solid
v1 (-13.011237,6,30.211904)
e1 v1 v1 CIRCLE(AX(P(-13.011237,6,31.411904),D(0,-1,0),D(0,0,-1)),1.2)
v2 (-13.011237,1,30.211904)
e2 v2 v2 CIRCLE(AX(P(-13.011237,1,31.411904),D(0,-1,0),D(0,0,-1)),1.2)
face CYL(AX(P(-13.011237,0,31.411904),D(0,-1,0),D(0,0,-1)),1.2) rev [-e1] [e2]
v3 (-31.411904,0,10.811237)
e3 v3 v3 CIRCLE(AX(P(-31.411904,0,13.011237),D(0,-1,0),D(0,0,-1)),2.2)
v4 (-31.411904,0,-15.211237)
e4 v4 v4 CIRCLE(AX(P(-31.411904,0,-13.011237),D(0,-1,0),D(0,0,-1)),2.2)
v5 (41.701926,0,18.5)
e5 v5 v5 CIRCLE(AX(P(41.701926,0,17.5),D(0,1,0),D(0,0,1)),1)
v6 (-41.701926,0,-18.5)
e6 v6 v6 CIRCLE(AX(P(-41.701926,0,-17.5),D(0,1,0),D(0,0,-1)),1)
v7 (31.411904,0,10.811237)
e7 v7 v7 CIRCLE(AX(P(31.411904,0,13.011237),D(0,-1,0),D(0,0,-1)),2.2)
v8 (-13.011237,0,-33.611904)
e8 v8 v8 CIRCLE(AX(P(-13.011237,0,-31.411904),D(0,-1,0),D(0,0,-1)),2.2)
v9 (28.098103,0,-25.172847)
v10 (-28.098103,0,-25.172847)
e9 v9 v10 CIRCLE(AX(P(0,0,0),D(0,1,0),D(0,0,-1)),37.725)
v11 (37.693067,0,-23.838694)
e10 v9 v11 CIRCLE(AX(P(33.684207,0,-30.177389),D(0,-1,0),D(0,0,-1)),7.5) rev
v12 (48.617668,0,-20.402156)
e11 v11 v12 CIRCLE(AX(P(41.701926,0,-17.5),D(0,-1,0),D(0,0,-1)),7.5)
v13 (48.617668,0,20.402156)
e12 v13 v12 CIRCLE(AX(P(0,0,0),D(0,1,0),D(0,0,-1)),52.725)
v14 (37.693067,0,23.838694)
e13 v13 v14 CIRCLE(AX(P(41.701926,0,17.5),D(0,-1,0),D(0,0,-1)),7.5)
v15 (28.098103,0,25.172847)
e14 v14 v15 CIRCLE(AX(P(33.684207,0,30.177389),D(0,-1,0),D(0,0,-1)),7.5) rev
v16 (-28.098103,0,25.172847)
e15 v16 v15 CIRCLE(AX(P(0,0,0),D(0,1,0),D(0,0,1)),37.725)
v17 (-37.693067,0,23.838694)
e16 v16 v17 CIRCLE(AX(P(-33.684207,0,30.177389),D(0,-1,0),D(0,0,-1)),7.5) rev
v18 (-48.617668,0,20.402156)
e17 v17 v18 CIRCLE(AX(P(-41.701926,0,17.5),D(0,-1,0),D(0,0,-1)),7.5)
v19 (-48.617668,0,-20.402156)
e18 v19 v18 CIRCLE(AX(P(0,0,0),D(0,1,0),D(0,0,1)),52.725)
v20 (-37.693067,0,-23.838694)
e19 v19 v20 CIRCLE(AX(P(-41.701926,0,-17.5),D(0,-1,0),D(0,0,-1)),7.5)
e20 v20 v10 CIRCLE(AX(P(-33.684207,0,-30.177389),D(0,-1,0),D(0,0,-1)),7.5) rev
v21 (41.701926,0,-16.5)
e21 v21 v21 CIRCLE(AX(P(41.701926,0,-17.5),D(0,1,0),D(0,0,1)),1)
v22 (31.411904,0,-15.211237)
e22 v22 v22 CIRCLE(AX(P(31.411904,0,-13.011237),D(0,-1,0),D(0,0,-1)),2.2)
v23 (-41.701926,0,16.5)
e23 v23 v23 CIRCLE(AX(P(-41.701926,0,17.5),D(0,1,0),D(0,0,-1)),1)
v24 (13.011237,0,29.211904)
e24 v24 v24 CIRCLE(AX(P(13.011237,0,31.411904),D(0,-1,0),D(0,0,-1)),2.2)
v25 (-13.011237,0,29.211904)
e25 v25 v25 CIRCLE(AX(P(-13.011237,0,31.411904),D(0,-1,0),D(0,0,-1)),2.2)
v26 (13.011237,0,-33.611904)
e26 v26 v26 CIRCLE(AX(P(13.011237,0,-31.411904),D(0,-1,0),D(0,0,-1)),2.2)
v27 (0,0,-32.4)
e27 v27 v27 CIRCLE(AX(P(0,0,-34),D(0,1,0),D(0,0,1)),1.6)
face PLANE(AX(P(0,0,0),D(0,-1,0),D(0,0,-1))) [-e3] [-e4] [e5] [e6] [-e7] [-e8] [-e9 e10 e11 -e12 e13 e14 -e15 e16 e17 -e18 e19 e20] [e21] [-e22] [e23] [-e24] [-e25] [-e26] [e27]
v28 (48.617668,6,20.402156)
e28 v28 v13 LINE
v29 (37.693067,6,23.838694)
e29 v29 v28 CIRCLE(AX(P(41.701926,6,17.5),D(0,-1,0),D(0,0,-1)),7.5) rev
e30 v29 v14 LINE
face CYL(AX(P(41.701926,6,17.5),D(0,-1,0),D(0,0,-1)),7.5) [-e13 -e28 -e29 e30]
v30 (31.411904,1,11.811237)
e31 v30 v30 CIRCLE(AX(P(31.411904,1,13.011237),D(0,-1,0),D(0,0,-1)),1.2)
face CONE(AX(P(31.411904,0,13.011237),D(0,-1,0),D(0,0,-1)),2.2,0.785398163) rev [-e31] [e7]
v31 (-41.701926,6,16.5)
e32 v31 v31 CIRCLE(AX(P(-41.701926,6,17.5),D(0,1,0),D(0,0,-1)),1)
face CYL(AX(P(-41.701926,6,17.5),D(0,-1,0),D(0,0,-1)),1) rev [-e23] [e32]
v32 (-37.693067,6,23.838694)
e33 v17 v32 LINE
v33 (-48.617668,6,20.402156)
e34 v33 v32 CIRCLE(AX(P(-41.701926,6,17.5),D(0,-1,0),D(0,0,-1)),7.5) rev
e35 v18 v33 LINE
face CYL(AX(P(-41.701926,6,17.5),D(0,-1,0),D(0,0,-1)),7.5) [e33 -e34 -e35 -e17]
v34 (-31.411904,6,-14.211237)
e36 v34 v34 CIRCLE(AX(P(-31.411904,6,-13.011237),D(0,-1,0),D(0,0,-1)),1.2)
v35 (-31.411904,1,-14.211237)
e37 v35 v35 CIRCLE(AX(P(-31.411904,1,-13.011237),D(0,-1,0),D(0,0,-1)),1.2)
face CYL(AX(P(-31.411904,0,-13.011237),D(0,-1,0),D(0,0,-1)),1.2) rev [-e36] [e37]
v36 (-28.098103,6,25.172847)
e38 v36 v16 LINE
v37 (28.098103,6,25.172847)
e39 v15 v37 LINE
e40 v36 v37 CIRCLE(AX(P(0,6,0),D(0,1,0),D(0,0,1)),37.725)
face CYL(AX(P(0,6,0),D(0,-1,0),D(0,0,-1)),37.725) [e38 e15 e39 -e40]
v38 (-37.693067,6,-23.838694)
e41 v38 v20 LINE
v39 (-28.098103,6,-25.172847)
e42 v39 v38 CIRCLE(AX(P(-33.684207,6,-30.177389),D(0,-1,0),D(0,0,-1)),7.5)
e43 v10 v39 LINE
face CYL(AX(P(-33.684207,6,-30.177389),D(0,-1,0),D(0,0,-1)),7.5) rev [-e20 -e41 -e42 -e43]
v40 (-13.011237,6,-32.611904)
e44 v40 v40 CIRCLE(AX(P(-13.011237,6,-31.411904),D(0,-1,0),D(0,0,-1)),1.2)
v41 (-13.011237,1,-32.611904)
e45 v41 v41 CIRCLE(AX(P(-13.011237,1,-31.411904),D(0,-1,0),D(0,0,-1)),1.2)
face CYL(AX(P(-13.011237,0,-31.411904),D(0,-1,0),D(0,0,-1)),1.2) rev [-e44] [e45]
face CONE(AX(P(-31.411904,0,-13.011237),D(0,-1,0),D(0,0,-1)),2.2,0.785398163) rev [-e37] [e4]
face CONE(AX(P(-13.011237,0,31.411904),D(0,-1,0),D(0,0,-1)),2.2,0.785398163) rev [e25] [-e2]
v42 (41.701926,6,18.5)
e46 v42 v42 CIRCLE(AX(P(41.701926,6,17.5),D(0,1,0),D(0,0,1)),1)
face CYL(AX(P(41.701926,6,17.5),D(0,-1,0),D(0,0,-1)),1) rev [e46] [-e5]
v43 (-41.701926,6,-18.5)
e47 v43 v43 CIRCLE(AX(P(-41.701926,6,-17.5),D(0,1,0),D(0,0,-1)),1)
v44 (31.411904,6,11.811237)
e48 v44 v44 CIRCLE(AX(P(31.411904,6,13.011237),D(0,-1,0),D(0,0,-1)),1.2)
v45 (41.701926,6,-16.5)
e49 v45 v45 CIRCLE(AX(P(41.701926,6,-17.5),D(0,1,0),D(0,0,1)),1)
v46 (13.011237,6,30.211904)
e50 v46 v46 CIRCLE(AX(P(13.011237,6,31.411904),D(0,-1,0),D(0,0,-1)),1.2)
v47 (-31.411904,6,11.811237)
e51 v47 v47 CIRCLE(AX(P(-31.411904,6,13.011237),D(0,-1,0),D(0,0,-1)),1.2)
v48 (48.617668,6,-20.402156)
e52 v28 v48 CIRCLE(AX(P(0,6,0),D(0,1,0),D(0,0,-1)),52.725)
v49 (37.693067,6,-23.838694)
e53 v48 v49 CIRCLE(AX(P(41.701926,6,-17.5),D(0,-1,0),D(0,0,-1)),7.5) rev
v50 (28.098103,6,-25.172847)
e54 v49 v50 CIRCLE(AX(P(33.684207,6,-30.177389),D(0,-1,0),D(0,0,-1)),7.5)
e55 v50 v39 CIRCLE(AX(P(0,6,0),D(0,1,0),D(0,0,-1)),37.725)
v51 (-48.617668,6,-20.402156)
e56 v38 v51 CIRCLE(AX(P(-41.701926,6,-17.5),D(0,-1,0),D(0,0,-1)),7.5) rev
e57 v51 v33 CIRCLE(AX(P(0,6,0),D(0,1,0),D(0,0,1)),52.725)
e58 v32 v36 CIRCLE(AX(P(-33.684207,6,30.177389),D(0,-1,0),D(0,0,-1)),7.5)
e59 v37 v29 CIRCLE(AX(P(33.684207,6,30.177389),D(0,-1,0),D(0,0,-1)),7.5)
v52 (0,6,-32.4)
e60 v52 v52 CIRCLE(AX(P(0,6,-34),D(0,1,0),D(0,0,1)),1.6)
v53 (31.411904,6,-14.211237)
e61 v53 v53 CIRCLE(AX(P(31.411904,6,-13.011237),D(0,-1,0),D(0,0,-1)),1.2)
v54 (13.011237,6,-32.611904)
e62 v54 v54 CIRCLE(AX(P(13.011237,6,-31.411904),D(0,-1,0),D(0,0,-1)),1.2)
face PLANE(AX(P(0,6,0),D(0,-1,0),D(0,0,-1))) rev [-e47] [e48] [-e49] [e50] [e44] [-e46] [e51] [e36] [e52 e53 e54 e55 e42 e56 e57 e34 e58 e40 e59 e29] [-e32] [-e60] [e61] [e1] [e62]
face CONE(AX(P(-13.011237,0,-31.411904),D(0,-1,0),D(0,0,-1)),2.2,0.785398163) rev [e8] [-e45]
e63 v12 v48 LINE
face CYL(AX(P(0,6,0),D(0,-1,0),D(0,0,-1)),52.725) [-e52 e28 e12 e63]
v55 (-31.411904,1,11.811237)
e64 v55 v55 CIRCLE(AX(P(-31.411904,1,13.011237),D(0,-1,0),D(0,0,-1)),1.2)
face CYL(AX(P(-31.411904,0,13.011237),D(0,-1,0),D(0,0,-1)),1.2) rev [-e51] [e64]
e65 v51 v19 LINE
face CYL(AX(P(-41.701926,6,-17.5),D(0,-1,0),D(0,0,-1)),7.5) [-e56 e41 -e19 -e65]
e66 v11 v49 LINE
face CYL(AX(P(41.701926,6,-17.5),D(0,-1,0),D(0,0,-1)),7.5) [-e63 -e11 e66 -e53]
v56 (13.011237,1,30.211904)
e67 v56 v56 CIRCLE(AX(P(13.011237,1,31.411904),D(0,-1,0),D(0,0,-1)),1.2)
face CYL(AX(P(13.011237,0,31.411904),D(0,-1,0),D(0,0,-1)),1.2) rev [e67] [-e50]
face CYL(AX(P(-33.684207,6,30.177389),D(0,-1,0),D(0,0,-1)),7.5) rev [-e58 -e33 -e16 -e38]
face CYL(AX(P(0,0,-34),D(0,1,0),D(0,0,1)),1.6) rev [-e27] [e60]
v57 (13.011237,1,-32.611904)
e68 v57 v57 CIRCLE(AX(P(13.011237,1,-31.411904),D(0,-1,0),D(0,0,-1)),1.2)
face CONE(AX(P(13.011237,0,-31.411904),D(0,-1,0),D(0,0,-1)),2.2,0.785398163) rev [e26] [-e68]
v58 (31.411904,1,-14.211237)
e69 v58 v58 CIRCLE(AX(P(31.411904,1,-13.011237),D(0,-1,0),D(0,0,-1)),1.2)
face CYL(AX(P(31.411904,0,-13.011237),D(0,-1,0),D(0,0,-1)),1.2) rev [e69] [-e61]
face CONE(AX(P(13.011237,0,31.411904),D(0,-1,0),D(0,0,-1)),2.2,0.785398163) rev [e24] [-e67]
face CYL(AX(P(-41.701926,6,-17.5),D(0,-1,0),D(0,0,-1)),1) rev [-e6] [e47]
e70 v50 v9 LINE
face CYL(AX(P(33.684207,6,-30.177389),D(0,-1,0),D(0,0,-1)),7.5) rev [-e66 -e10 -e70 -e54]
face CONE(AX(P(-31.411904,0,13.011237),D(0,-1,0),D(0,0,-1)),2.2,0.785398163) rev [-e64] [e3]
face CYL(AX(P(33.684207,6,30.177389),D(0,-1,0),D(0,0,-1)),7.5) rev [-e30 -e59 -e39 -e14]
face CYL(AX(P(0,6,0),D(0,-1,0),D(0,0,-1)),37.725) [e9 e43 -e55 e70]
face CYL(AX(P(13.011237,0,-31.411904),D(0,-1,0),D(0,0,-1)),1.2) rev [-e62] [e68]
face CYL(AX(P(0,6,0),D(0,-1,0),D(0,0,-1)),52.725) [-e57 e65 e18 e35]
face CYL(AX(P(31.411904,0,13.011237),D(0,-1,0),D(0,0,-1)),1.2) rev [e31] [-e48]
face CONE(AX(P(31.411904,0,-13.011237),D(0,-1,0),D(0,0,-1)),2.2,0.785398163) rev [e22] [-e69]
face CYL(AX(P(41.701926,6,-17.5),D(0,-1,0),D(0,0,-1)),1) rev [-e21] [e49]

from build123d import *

# Parameters (mm, degrees)
SKETCH1_R                                       = 1
BOSS_EXTRUDE1_DEPTH                             = 6
FILLET1_R                                       = 7.5
SKETCH2_R                                       = 1.6
CUT_EXTRUDE1_DEPTH                              = 66.108380797
CSK_FOR_M2_FLAT_HEAD_MACHINE_SCREW1_D           = 2.4
CSK_FOR_M2_FLAT_HEAD_MACHINE_SCREW1_CSINK_D     = 4.4
CSK_FOR_M2_FLAT_HEAD_MACHINE_SCREW1_CSINK_ANGLE = 90


with BuildPart() as part:
    # Sketch1 → Boss-Extrude1 (new body)
    with BuildSketch(Plane(origin=(0, 0, 0), x_dir=(1, 0, 0), z_dir=(0, 1, 0))):
        with BuildLine():
            Line((31.883633055, 20.164562188), (44.561021943, 28.182280752))
            ThreePointArc((44.561021943, 28.182280752), (52.725, 0), (44.561021943, -28.182280752))
            Line((44.561021943, -28.182280752), (31.883633055, -20.164562188))
            ThreePointArc((31.883633055, -20.164562188), (0, -37.725), (-31.883633055, -20.164562188))
            Line((-31.883633055, -20.164562188), (-44.561021943, -28.182280752))
            ThreePointArc((-44.561021943, -28.182280752), (-52.725, 0), (-44.561021943, 28.182280752))
            Line((-44.561021943, 28.182280752), (-31.883633055, 20.164562188))
            ThreePointArc((-31.883633055, 20.164562188), (0, 37.725), (31.883633055, 20.164562188))
        make_face()
        with Locations(Location((-13.0112367, 31.411904105, 0), (0, 0, 270))):
            Circle(SKETCH1_R, mode=Mode.SUBTRACT)
        with Locations(Location((13.0112367, 31.411904105, 0), (0, 0, 270))):
            Circle(SKETCH1_R, mode=Mode.SUBTRACT)
        with Locations(Location((31.411904105, 13.0112367, 0), (0, 0, 270))):
            Circle(SKETCH1_R, mode=Mode.SUBTRACT)
        with Locations(Location((31.411904105, -13.0112367, 0), (0, 0, 270))):
            Circle(SKETCH1_R, mode=Mode.SUBTRACT)
        with Locations(Location((13.0112367, -31.411904105, 0), (0, 0, 270))):
            Circle(SKETCH1_R, mode=Mode.SUBTRACT)
        with Locations(Location((-13.0112367, -31.411904105, 0), (0, 0, 270))):
            Circle(SKETCH1_R, mode=Mode.SUBTRACT)
        with Locations(Location((-31.411904105, -13.0112367, 0), (0, 0, 270))):
            Circle(SKETCH1_R, mode=Mode.SUBTRACT)
        with Locations(Location((-31.411904105, 13.0112367, 0), (0, 0, 270))):
            Circle(SKETCH1_R, mode=Mode.SUBTRACT)
        with Locations(Location((41.701925915, 17.5, 0), (0, 0, 270))):
            Circle(SKETCH1_R, mode=Mode.SUBTRACT)
        with Locations(Location((41.701925915, -17.5, 0), (0, 0, 270))):
            Circle(SKETCH1_R, mode=Mode.SUBTRACT)
        with Locations(Location((-41.701925915, 17.5, 0), (0, 0, 90))):
            Circle(SKETCH1_R, mode=Mode.SUBTRACT)
        with Locations(Location((-41.701925915, -17.5, 0), (0, 0, 90))):
            Circle(SKETCH1_R, mode=Mode.SUBTRACT)
    extrude(amount=BOSS_EXTRUDE1_DEPTH)

    # Fillet1
    fillet1_edges = [part.edges().sort_by_distance(p)[0] for p in [
        (44.561021943, 3, 28.182280752),
        (31.883633055, 3, 20.164562188),
        (-44.561021943, 3, 28.182280752),
        (-31.883633055, 3, 20.164562188),
        (44.561021943, 3, -28.182280752),
        (31.883633055, 3, -20.164562188),
        (-44.561021943, 3, -28.182280752),
        (-31.883633055, 3, -20.164562188),
    ]]
    fillet(fillet1_edges, radius=FILLET1_R - 0.0001)  # a hair under: the kernel refuses the full size

    # Sketch2 → Cut-Extrude1 (cut, through all)
    with BuildSketch(Plane(origin=(0, 6, 0), x_dir=(1, 0, 0), z_dir=(0, 1, 0))):
        with Locations(Location((0, 34, 0), (0, 0, 270))):
            Circle(SKETCH2_R)
    extrude(amount=-CUT_EXTRUDE1_DEPTH, mode=Mode.SUBTRACT)

    # CSK for M2 Flat Head Machine Screw1 (through all)
    with Locations(Plane(origin=(0, 0, 0), x_dir=(-1, 0, 0), z_dir=(0, -1, 0))):
        with Locations((13.0112367, -31.411904105), (-13.0112367, -31.411904105), (-31.411904105, -13.0112367), (-31.411904105, 13.0112367), (-13.0112367, 31.411904105), (13.0112367, 31.411904105), (31.411904105, 13.0112367), (31.411904105, -13.0112367)):
            CounterSinkHole(CSK_FOR_M2_FLAT_HEAD_MACHINE_SCREW1_D / 2, CSK_FOR_M2_FLAT_HEAD_MACHINE_SCREW1_CSINK_D / 2, counter_sink_angle=CSK_FOR_M2_FLAT_HEAD_MACHINE_SCREW1_CSINK_ANGLE)


solid = part.part
